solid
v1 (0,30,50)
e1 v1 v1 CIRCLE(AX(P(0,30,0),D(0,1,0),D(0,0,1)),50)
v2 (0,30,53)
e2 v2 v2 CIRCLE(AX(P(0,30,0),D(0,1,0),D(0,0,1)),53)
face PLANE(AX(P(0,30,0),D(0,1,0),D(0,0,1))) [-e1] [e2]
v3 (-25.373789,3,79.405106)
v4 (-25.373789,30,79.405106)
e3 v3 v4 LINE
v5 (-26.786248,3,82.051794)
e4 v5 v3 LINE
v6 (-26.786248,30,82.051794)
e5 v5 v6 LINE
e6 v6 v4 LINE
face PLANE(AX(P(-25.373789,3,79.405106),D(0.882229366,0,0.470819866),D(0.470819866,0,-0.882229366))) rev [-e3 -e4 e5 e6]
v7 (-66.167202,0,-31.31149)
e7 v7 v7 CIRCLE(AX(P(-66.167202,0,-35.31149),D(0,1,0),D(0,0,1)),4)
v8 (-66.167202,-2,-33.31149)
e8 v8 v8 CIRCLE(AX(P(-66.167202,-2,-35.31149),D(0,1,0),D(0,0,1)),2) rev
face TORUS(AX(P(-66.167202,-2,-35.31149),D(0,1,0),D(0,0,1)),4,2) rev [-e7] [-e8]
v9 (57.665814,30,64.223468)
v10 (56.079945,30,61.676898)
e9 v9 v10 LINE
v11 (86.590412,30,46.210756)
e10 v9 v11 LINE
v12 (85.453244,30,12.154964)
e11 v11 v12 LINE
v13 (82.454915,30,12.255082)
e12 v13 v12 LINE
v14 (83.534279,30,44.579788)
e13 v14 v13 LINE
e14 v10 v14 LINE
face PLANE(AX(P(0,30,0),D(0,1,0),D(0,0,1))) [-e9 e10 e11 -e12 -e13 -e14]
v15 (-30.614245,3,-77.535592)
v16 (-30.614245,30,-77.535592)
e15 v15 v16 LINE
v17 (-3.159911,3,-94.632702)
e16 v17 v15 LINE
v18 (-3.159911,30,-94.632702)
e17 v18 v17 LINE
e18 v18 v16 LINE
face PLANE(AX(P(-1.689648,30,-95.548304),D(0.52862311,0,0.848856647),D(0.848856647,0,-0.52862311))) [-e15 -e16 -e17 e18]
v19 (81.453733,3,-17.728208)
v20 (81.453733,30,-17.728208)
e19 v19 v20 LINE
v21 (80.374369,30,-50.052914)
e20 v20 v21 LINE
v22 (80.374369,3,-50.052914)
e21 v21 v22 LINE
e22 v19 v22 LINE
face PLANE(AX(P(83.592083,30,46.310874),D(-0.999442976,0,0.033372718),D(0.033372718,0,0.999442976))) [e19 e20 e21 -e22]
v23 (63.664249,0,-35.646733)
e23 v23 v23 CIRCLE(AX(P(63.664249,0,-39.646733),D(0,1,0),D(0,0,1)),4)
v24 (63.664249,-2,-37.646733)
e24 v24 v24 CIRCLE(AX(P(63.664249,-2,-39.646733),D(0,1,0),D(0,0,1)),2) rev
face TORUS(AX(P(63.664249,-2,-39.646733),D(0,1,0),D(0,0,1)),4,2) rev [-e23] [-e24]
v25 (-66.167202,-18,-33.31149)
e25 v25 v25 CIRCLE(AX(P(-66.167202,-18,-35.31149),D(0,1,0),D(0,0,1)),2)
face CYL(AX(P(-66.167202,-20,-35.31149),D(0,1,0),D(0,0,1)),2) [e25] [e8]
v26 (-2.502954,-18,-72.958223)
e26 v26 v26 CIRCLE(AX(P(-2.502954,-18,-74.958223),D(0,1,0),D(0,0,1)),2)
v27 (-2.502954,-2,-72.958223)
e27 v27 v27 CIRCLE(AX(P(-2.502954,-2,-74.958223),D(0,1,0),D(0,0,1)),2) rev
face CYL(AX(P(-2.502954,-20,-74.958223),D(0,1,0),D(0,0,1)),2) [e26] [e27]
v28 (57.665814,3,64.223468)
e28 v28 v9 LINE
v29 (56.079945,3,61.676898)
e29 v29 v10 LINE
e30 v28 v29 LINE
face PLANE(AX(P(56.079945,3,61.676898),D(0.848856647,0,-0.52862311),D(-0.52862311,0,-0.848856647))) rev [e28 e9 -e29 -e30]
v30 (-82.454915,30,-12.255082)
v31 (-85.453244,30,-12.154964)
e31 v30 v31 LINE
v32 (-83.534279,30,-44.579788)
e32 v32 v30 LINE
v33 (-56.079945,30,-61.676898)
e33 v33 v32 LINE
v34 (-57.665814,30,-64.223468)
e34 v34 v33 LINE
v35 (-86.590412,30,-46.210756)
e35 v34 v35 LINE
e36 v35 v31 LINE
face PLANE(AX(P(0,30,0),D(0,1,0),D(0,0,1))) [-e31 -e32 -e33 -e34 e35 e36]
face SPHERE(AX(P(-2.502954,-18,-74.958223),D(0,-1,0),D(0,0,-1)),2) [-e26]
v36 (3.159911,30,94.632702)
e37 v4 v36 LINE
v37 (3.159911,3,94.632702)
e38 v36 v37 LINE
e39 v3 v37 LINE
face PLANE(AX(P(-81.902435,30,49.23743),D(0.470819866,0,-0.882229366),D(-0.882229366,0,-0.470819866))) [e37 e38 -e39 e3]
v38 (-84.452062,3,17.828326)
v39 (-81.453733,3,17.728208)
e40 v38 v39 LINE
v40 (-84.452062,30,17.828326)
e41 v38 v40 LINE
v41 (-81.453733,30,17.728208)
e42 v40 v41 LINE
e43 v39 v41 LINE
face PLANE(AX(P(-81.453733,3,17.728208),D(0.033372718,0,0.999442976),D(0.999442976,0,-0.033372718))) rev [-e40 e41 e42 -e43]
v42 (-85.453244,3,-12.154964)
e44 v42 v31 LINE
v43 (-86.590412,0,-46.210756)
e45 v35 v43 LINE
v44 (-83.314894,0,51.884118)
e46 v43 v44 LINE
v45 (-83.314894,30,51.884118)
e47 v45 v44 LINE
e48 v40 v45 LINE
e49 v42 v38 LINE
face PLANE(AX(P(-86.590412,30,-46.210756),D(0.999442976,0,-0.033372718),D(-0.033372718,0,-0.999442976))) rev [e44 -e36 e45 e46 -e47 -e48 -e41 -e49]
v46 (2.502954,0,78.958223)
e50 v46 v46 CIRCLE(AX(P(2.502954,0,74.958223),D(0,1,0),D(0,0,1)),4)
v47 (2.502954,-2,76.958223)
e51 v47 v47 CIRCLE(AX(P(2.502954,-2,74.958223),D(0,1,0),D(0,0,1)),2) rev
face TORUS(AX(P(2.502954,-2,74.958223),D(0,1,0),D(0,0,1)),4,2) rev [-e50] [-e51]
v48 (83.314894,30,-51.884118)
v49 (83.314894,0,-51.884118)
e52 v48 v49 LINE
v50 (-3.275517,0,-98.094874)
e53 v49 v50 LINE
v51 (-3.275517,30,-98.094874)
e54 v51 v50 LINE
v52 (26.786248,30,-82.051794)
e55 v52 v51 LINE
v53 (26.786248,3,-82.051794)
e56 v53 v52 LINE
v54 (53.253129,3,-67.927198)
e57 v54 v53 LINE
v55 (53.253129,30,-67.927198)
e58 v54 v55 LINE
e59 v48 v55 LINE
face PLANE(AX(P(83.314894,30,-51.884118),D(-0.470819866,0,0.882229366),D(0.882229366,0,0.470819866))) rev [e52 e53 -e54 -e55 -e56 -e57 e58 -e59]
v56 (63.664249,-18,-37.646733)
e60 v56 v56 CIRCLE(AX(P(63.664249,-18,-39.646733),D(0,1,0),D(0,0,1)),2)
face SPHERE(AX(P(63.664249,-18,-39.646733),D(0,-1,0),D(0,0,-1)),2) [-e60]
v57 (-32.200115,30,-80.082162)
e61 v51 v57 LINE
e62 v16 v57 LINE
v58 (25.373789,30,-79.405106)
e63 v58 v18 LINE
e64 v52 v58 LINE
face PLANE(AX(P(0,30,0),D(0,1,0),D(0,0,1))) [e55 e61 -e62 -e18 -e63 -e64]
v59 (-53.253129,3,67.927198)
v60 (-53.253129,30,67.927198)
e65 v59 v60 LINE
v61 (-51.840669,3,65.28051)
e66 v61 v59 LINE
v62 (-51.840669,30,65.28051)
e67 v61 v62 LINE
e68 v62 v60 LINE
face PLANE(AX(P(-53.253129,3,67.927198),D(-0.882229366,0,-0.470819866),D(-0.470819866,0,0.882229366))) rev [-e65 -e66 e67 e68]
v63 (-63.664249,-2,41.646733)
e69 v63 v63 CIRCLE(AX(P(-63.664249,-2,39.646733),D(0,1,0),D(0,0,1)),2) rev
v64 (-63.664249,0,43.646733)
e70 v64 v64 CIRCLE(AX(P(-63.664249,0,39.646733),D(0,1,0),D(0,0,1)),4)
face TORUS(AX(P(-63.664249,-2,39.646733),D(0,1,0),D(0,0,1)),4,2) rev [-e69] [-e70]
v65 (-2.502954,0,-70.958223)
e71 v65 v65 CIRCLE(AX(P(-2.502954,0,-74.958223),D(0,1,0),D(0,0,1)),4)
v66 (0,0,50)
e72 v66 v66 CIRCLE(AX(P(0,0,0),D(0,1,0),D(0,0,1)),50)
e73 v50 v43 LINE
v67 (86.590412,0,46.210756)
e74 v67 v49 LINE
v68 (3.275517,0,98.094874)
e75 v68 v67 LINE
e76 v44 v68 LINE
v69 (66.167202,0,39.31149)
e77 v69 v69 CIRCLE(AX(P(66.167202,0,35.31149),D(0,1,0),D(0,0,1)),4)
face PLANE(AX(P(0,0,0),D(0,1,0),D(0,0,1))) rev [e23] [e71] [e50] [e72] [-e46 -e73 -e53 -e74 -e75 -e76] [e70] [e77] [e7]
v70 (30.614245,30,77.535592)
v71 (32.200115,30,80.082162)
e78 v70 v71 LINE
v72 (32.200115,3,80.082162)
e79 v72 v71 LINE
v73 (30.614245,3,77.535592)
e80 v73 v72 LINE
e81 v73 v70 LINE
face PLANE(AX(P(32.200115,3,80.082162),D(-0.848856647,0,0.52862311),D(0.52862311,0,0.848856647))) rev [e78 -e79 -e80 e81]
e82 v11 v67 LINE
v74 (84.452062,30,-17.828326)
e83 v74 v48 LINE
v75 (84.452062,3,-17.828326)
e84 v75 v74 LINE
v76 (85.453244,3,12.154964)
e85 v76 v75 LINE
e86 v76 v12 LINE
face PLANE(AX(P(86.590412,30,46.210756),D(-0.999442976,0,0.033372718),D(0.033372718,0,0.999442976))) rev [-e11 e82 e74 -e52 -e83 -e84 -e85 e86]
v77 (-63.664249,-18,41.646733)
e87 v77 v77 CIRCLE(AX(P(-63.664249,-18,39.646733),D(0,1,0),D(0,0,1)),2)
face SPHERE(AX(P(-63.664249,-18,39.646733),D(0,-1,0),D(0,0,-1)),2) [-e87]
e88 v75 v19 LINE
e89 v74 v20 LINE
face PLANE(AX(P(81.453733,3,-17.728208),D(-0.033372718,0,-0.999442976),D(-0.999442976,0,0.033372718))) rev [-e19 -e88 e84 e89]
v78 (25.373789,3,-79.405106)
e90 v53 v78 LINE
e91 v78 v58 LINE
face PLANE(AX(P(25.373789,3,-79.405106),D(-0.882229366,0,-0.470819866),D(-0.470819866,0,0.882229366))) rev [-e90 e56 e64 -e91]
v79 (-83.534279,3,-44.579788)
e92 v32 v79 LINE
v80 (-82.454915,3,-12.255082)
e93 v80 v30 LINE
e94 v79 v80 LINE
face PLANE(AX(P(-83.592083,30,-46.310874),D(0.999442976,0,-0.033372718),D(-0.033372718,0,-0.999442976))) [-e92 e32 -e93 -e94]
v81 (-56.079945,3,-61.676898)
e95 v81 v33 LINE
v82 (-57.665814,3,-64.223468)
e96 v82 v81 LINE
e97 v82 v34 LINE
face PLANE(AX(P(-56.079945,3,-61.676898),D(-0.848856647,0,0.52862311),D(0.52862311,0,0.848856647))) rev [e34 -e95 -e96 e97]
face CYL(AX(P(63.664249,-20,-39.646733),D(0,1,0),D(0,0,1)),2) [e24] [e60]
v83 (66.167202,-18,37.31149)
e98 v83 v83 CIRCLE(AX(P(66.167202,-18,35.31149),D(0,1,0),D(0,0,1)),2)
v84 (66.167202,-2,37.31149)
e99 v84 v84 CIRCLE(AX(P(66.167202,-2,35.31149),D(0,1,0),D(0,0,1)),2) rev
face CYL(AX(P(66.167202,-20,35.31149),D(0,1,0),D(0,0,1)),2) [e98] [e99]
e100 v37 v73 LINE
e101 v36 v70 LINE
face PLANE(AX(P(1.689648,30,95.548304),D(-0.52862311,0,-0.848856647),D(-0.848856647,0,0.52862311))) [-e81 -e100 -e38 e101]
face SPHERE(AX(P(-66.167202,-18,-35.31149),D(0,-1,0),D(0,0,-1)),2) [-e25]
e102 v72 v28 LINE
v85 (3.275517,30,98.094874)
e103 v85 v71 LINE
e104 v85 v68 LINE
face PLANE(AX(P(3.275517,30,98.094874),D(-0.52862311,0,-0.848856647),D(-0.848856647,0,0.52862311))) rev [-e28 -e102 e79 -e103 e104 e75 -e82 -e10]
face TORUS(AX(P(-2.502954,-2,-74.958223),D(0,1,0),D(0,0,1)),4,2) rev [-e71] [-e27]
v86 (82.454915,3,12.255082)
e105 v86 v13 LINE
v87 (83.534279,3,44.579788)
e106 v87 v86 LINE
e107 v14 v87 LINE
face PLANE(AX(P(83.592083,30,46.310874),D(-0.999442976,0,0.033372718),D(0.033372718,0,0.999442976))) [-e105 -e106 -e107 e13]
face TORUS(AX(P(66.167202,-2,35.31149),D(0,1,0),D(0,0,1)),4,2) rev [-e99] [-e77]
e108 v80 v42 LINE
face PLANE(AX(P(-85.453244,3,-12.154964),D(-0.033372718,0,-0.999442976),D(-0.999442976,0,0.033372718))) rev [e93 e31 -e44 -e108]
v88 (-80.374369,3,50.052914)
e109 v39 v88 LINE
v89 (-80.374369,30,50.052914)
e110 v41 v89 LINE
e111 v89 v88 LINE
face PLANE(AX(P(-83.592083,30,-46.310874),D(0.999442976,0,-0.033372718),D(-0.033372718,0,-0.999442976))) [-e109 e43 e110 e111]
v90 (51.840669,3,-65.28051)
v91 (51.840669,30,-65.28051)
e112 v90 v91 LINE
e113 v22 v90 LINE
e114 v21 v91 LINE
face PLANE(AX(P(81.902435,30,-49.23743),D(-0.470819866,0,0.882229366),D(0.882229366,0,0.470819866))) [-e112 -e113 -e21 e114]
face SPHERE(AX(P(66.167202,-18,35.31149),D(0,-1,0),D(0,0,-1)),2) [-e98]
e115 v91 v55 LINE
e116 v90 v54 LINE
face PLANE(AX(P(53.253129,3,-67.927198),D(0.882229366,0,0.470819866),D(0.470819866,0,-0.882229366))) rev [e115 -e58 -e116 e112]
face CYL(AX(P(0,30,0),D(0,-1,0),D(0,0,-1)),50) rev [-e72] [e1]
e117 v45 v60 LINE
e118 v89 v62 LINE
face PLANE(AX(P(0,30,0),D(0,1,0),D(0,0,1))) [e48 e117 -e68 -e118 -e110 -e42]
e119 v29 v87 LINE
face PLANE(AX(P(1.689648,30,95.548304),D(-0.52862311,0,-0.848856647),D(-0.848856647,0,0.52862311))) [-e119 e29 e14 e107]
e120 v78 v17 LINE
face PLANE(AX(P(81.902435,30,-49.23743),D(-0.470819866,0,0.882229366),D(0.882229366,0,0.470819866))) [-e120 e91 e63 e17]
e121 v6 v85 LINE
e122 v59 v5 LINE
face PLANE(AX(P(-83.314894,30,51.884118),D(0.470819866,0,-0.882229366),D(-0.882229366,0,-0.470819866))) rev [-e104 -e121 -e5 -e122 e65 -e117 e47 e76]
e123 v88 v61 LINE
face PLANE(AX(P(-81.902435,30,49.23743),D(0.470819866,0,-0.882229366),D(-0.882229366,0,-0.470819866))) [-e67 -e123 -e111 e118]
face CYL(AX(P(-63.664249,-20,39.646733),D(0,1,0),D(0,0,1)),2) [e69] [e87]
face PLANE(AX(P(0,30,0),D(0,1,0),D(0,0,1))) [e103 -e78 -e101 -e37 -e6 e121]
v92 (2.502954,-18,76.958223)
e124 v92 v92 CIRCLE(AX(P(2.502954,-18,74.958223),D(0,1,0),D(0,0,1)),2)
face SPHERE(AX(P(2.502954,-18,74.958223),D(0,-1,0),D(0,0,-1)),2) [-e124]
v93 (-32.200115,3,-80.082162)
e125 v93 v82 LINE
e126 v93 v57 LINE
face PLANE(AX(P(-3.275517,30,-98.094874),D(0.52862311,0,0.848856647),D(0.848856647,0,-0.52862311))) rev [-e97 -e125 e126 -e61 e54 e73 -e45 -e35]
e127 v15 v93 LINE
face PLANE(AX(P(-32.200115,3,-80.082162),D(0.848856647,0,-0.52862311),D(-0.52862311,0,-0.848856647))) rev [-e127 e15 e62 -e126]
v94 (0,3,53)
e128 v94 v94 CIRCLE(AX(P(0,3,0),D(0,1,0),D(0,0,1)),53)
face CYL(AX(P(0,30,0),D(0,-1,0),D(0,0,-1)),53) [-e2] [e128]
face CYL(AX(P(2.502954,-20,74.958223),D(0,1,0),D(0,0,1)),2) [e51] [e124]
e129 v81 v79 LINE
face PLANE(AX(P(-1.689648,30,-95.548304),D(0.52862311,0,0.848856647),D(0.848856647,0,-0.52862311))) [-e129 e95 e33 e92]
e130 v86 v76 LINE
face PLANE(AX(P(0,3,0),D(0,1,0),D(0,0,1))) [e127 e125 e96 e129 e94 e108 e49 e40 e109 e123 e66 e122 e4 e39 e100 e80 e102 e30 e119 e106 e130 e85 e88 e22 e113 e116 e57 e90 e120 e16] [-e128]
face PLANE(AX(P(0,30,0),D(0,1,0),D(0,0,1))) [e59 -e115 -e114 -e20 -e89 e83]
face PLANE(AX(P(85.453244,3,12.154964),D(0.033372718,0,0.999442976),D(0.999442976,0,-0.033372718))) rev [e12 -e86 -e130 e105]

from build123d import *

# Parameters (mm, degrees)
SKETCH2_R           = 50
BOSS_EXTRUDE1_DEPTH = 30
SKETCH4_R           = 2
BOSS_EXTRUDE2_DEPTH = 20
FILLET1_R           = 2
SHELL1_START        = 3
SHELL1_OUTLINE_R    = 53
SHELL1_DEPTH        = 27
CUT_EXTRUDE1_DEPTH  = 27


# Read off the part's stored shape, not the designer's step: Shell1
with BuildPart() as part:
    # Sketch2 → Boss-Extrude1 (new body)
    with BuildSketch(Plane(origin=(0, 0, 0), x_dir=(1, 0, 0), z_dir=(0, 1, 0))):
        Polygon((-83.314894361, -51.8841181), (3.275517147, -98.09487408), (86.590411508, -46.21075598), (83.314894361, 51.8841181), (-3.275517147, 98.09487408), (-86.590411508, 46.21075598), align=None)
        with Locations(Location((0, 0, 0), (0, 0, 270))):
            Circle(SKETCH2_R, mode=Mode.SUBTRACT)
    extrude(amount=BOSS_EXTRUDE1_DEPTH)

    # Sketch4 → Boss-Extrude2 (add)
    with BuildSketch(Plane.XZ):
        with Locations(Location((-66.167202432, -35.311489947, 0), (0, 0, 90))):
            Circle(SKETCH4_R)
        with Locations(Location((-63.664248556, 39.64673323, 0), (0, 0, 90))):
            Circle(SKETCH4_R)
        with Locations(Location((2.502953876, 74.958223177, 0), (0, 0, 90))):
            Circle(SKETCH4_R)
        with Locations(Location((66.167202432, 35.311489947, 0), (0, 0, 90))):
            Circle(SKETCH4_R)
        with Locations(Location((63.664248556, -39.64673323, 0), (0, 0, 90))):
            Circle(SKETCH4_R)
        with Locations(Location((-2.502953876, -74.958223177, 0), (0, 0, 90))):
            Circle(SKETCH4_R)
    extrude(amount=BOSS_EXTRUDE2_DEPTH)

    # Fillet1
    fillet1_edges = [part.edges().sort_by_distance(p)[0] for p in [
        (-63.664248556, 0, 37.64673323),
        (-63.664248556, -20, 37.64673323),
        (-66.167202432, 0, -37.311489947),
        (-66.167202432, -20, -37.311489947),
        (66.167202432, 0, 33.311489947),
        (66.167202432, -20, 33.311489947),
        (2.502953876, 0, 72.958223177),
        (2.502953876, -20, 72.958223177),
        (-2.502953876, 0, -76.958223177),
        (-2.502953876, -20, -76.958223177),
        (63.664248556, 0, -41.64673323),
        (63.664248556, -20, -41.64673323),
    ]]
    fillet(fillet1_edges, radius=FILLET1_R)

    # Shell1 outline → Shell1 (cut)
    with BuildSketch(Plane(origin=(0, 0, 0), x_dir=(1, 0, 0), z_dir=(0, 1, 0)).offset(SHELL1_START)):
        Polygon((-83.534279337, 44.579788122), (-80.374368678, -50.052913931), (3.159910659, -94.632702054), (83.534279337, -44.579788122), (80.374368678, 50.052913931), (-3.159910659, 94.632702054), align=None)
        Circle(SHELL1_OUTLINE_R, mode=Mode.SUBTRACT)
    extrude(amount=SHELL1_DEPTH, mode=Mode.SUBTRACT)

    # Sketch8 → Cut-Extrude1 (cut)
    with BuildSketch(Plane(origin=(0, 30, 0), x_dir=(1, 0, 0), z_dir=(0, 1, 0))):
        Polygon((53.253129093, 67.9271981), (51.840669496, 65.280510003), (25.373788523, 79.405105982), (26.786248121, 82.051794079), align=None)
        Polygon((84.452062159, 17.828325695), (85.453243709, -12.154963576), (82.454914782, -12.255081731), (81.453733232, 17.72820754), align=None)
        Polygon((57.665814038, -64.223468384), (32.200114616, -80.082161676), (30.614245287, -77.535591734), (56.079944709, -61.676898442), align=None)
        Polygon((-26.786248121, -82.051794079), (-53.253129093, -67.9271981), (-51.840669496, -65.280510003), (-25.373788523, -79.405105982), align=None)
        Polygon((-84.452062159, -17.828325695), (-85.453243709, 12.154963576), (-82.454914782, 12.255081731), (-81.453733232, -17.72820754), align=None)
        Polygon((-57.665814038, 64.223468384), (-32.200114616, 80.082161676), (-30.614245287, 77.535591734), (-56.079944709, 61.676898442), align=None)
    extrude(amount=-CUT_EXTRUDE1_DEPTH, mode=Mode.SUBTRACT)


solid = part.part
